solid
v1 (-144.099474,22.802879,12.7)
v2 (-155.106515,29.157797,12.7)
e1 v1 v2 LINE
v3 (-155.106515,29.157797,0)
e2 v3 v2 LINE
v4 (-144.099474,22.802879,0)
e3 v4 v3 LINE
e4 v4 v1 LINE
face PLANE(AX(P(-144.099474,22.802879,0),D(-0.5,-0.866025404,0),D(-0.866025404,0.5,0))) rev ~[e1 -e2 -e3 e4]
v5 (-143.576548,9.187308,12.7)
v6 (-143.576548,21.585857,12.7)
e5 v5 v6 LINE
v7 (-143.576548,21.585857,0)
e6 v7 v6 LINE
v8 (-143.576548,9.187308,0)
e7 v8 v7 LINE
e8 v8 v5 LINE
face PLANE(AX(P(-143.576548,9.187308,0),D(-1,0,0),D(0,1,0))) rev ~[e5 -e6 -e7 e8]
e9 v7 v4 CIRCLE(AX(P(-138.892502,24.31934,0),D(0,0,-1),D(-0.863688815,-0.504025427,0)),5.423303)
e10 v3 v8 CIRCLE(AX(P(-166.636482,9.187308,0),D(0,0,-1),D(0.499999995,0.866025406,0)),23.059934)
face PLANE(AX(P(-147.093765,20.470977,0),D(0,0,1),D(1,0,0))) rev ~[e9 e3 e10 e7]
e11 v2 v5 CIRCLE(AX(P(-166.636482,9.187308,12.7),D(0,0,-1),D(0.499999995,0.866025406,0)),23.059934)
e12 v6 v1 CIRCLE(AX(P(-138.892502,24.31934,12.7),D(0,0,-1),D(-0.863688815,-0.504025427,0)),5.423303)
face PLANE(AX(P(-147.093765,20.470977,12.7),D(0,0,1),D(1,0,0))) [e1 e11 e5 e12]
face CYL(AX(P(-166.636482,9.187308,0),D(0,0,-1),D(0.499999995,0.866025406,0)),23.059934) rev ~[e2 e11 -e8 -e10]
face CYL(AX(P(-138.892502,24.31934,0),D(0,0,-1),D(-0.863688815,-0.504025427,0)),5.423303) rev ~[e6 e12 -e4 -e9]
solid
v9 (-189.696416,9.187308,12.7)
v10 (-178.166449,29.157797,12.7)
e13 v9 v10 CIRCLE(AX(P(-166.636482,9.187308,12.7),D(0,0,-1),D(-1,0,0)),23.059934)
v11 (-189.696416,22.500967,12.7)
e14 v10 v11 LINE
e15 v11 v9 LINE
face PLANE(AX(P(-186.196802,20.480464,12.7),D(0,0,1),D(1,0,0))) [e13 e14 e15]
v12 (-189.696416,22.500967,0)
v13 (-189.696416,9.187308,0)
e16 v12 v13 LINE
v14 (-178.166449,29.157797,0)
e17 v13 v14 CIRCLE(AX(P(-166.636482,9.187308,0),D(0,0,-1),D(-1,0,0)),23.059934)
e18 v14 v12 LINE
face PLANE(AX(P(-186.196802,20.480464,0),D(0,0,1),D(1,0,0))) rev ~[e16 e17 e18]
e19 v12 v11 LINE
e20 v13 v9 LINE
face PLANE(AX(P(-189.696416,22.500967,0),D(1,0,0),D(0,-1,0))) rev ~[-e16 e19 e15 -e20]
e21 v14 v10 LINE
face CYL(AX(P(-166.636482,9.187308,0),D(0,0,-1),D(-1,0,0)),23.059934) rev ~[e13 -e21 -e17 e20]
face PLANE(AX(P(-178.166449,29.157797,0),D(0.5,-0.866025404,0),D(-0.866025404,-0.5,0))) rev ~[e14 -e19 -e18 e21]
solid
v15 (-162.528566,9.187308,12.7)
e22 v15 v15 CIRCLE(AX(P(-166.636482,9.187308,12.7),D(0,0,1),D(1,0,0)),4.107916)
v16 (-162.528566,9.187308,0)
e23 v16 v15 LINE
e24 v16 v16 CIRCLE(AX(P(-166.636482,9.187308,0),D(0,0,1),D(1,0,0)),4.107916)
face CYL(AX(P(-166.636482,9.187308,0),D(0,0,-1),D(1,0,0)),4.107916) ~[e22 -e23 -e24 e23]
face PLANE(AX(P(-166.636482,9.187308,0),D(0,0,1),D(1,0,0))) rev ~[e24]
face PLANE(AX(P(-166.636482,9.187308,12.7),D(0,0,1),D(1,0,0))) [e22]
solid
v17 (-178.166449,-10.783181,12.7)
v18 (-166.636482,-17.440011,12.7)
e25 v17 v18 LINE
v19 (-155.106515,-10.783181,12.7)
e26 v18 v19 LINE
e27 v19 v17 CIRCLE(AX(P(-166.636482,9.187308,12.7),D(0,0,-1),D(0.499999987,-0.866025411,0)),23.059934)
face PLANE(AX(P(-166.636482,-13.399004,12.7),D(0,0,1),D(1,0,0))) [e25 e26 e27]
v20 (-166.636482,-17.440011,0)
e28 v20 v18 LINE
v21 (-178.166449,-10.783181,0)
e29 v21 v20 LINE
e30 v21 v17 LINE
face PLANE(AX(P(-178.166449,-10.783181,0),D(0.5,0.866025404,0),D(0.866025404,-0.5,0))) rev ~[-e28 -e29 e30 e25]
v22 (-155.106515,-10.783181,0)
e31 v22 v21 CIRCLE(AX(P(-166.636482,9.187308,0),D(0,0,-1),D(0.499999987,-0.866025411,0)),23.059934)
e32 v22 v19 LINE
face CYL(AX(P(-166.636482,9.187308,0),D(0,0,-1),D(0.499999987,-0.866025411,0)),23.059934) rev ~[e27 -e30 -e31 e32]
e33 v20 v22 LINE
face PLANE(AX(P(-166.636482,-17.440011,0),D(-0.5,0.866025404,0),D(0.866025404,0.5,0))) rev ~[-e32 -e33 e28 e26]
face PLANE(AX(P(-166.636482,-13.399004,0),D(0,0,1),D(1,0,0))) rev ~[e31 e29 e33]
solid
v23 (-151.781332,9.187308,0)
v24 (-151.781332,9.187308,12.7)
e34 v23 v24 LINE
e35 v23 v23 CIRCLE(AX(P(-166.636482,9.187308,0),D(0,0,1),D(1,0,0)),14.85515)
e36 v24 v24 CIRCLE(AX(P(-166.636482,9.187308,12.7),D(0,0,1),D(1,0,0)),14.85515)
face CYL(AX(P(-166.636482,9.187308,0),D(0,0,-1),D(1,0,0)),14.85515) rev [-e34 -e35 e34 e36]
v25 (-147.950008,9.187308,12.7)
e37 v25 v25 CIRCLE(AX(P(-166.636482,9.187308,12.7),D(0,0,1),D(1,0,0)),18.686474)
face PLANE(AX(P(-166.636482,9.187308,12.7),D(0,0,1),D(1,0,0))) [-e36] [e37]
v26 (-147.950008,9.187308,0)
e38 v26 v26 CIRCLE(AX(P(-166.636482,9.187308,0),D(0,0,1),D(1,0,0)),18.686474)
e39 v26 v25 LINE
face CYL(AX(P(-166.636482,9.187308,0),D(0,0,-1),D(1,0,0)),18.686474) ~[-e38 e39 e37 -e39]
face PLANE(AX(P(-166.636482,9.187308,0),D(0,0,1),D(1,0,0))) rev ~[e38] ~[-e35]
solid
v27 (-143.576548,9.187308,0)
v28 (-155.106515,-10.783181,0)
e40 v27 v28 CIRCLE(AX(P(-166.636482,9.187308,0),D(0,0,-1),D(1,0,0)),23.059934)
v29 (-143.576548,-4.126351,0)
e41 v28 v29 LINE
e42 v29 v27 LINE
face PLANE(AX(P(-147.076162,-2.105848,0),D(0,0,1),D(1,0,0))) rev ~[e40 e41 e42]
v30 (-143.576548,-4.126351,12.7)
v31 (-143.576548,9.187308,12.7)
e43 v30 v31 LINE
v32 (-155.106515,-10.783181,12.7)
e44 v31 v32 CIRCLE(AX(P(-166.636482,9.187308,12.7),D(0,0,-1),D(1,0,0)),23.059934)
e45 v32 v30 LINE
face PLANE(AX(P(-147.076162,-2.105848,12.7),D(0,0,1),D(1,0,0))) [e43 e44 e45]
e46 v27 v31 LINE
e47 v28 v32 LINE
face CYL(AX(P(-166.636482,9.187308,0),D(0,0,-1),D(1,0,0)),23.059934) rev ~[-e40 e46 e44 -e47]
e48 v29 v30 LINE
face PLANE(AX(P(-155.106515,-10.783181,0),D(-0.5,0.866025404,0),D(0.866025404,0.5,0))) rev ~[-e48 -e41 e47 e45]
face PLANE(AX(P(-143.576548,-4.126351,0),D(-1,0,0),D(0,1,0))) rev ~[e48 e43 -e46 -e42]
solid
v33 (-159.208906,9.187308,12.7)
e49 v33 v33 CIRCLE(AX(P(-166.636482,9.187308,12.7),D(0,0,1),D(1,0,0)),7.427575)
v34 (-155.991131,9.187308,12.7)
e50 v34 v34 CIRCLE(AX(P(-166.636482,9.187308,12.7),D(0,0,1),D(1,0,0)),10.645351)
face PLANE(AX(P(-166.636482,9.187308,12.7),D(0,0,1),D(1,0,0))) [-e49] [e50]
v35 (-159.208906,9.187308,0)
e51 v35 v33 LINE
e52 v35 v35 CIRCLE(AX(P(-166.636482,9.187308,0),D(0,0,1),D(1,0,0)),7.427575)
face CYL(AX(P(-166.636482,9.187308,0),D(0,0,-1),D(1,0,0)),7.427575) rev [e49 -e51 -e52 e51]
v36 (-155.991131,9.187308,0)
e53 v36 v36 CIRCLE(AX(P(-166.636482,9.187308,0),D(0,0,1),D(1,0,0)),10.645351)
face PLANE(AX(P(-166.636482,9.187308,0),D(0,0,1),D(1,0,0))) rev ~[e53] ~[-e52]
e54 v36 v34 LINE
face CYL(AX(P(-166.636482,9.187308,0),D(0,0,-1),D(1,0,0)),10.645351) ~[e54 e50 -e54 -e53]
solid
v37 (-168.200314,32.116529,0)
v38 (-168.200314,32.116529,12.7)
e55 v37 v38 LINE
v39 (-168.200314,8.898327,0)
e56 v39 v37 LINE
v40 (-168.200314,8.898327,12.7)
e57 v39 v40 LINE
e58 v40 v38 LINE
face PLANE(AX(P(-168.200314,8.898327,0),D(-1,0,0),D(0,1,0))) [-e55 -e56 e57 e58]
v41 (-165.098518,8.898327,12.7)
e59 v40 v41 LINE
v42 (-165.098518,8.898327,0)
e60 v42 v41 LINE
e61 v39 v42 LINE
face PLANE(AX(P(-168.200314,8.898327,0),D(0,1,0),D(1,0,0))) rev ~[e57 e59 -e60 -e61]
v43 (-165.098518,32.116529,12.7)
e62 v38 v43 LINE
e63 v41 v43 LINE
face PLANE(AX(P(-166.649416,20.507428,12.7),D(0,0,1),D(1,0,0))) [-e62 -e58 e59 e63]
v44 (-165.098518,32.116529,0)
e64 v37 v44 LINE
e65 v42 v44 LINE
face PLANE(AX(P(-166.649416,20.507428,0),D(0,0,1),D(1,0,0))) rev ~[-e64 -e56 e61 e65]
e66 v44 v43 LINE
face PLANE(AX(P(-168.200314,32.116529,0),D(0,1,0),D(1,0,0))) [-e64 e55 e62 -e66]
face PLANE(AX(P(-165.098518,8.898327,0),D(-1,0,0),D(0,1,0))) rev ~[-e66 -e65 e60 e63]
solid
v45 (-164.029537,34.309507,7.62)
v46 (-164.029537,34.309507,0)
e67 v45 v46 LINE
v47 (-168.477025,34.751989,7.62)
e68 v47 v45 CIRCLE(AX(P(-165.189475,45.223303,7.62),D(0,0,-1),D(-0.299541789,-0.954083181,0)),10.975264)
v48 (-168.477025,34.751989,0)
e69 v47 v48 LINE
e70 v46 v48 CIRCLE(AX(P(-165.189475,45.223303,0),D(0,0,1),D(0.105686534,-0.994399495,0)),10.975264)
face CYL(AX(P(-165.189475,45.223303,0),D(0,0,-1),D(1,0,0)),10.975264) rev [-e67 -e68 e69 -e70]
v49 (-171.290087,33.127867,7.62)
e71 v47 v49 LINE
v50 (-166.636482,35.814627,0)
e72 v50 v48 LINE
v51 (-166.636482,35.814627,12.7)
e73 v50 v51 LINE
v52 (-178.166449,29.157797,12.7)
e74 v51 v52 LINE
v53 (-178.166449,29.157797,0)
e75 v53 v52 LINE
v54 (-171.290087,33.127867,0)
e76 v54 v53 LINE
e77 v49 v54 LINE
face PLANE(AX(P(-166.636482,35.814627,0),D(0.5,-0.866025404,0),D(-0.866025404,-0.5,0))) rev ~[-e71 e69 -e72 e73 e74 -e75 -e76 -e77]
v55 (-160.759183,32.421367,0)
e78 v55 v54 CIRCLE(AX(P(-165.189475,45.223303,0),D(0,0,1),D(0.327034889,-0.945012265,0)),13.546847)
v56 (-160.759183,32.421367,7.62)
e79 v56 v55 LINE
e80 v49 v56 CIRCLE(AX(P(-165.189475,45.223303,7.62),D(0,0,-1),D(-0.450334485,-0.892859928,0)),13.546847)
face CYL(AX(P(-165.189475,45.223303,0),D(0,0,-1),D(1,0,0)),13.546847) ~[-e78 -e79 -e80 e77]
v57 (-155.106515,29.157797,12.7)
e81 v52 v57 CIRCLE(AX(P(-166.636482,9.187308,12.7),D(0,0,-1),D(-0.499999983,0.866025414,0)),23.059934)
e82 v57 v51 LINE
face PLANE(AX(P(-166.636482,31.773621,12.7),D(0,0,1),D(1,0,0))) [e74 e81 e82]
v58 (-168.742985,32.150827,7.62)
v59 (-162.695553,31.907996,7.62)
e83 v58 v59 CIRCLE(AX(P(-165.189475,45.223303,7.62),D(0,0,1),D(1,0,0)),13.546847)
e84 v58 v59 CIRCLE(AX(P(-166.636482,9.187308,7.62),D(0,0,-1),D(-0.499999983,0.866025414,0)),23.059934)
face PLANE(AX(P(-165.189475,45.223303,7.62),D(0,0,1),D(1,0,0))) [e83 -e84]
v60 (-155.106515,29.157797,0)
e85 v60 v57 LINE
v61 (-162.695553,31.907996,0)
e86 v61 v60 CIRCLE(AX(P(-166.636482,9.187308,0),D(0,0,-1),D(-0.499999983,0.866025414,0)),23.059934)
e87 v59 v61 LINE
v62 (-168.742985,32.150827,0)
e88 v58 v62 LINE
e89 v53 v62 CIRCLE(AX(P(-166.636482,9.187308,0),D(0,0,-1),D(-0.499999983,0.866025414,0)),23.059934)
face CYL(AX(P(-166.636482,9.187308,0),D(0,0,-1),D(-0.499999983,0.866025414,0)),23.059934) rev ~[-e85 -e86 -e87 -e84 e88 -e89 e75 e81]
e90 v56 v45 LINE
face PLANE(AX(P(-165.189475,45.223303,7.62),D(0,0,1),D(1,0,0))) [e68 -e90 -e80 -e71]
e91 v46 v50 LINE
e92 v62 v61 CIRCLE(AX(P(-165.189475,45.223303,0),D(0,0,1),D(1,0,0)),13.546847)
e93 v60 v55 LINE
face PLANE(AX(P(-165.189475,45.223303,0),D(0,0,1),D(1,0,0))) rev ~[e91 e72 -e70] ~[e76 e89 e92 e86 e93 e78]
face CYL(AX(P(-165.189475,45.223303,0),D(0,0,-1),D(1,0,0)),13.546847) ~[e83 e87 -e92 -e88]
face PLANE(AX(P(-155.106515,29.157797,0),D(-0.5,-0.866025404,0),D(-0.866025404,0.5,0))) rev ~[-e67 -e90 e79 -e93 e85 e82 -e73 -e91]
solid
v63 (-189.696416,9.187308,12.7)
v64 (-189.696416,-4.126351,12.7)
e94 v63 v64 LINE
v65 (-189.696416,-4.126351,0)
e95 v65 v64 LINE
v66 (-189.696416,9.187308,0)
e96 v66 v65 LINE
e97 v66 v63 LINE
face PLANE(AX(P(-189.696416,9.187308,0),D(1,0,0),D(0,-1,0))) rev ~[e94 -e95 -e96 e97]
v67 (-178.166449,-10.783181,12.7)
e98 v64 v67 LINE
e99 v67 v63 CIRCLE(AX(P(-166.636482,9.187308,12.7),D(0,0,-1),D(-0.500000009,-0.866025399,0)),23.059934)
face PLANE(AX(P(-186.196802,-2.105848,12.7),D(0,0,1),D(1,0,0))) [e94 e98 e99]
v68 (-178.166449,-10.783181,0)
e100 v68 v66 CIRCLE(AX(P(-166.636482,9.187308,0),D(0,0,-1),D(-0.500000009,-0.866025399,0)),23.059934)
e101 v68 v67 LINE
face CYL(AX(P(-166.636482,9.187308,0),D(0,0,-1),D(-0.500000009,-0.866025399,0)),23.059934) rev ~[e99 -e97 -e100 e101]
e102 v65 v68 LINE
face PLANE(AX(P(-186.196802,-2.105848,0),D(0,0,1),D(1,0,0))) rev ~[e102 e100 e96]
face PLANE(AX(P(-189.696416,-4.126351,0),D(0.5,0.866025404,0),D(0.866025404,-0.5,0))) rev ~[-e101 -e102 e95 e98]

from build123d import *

# Parameters (mm, degrees)
F1_DEPTH = 12.7
F0_R     = 18.6864739048
F0_R_2   = 14.8551500705
F0_R_3   = 10.6453512424
F0_R_4   = 7.4275754644
F0_R_5   = 4.107916277
F2_R     = 13.5468466728
F2_R_2   = 10.9752635495
F3_DEPTH = 7.62
F4_W     = 3.1017959118
F4_H     = 23.2182014734
F5_DEPTH = 12.7


with BuildPart() as f1:
    # F0 (on Top) → F1 (new body)
    with BuildSketch(Plane.XY):
        with BuildLine():
            ThreePointArc((-178.1664486666, 29.1577973537), (-166.6364817093, 32.2472425178), (-155.1065147981, 29.1577971819))
            Line((-155.1065147981, 29.1577971819), (-166.6364818811, 35.814626781))
            Line((-166.6364818811, 35.814626781), (-178.1664486666, 29.1577973537))
        make_face()
    extrude(amount=F1_DEPTH)

    # F2 (on Top) → F3 (join)
    with BuildSketch(Plane.XY):
        with Locations((-165.1894748211, 45.2233031392)):
            Circle(F2_R)
        with Locations((-165.1894748211, 45.2233031392)):
            Circle(F2_R_2, mode=Mode.SUBTRACT)
    extrude(amount=F3_DEPTH)


with BuildPart() as f1b:
    # F0 (on Top) → F1, piece 2 (new body)
    with BuildSketch(Plane.XY):
        with BuildLine():
            ThreePointArc((-189.6964162588, 9.1873081401), (-186.6069707454, 20.7172755306), (-178.1664486666, 29.1577973537))
            Line((-178.1664486666, 29.1577973537), (-189.6964162588, 22.5009674605))
            Line((-189.6964162588, 22.5009674605), (-189.6964162588, 9.1873081401))
        make_face()
    extrude(amount=F1_DEPTH)


with BuildPart() as f1c:
    # F0 (on Top) → F1, piece 3 (new body)
    with BuildSketch(Plane.XY):
        with BuildLine():
            Line((-189.6964162588, -4.1263511803), (-178.1664492719, -10.783180724))
            ThreePointArc((-178.1664492719, -10.783180724), (-186.6069709201, -2.3426589477), (-189.6964162588, 9.1873081401))
            Line((-189.6964162588, 9.1873081401), (-189.6964162588, -4.1263511803))
        make_face()
    extrude(amount=F1_DEPTH)


with BuildPart() as f1d:
    # F0 (on Top) → F1, piece 4 (new body)
    with BuildSketch(Plane.XY):
        with BuildLine():
            Line((-166.6364818811, -17.4400105008), (-155.1065149821, -10.7831810079))
            ThreePointArc((-155.1065149821, -10.7831810079), (-166.636482165, -13.8726262376), (-178.1664492719, -10.783180724))
            Line((-178.1664492719, -10.783180724), (-166.6364818811, -17.4400105008))
        make_face()
    extrude(amount=F1_DEPTH)


with BuildPart() as f1e:
    # F0 (on Top) → F1, piece 5 (new body)
    with BuildSketch(Plane.XY):
        with BuildLine():
            Line((-143.5765475035, -4.1263511803), (-143.5765475035, 9.1873081401))
            ThreePointArc((-143.5765475035, 9.1873081401), (-146.6659929841, -2.3426591936), (-155.1065149821, -10.7831810079))
            Line((-155.1065149821, -10.7831810079), (-143.5765475035, -4.1263511803))
        make_face()
    extrude(amount=F1_DEPTH)


with BuildPart() as f1f:
    # F0 (on Top) → F1, piece 6 (new body)
    with BuildSketch(Plane.XY):
        with BuildLine():
            Line((-143.5765475035, 9.1873081401), (-143.5765475035, 21.5858570699))
            ThreePointArc((-143.5765475035, 21.5858570699), (-143.8753066183, 22.1783429053), (-144.0994738784, 22.8028791439))
            Line((-144.0994738784, 22.8028791439), (-155.1065147981, 29.1577971819))
            ThreePointArc((-155.1065147981, 29.1577971819), (-146.665992931, 20.7172753819), (-143.5765475035, 9.1873081401))
        make_face()
    extrude(amount=F1_DEPTH)


with BuildPart() as f1g:
    # F0 (on Top) → F1, piece 7 (new body)
    with BuildSketch(Plane.XY):
        with Locations((-166.6364818811, 9.1873081401)):
            Circle(F0_R)
        with Locations((-166.6364818811, 9.1873081401)):
            Circle(F0_R_2, mode=Mode.SUBTRACT)
    extrude(amount=F1_DEPTH)


with BuildPart() as f1h:
    # F0 (on Top) → F1, piece 8 (new body)
    with BuildSketch(Plane.XY):
        with Locations((-166.6364818811, 9.1873081401)):
            Circle(F0_R_3)
        with Locations((-166.6364818811, 9.1873081401)):
            Circle(F0_R_4, mode=Mode.SUBTRACT)
    extrude(amount=F1_DEPTH)


with BuildPart() as f1i:
    # F0 (on Top) → F1, piece 9 (new body)
    with BuildSketch(Plane.XY):
        with Locations((-166.6364818811, 9.1873081401)):
            Circle(F0_R_5)
    extrude(amount=F1_DEPTH)


with BuildPart() as f5:
    # F4 (on Top) → F5 (new body)
    with BuildSketch(Plane.XY):
        with Locations((-166.6494160891, 20.5074278638)):
            Rectangle(F4_W, F4_H)
    extrude(amount=F5_DEPTH)


solid = Compound([f1.part, f1b.part, f1c.part, f1d.part, f1e.part, f1f.part, f1g.part, f1h.part, f1i.part, f5.part])
